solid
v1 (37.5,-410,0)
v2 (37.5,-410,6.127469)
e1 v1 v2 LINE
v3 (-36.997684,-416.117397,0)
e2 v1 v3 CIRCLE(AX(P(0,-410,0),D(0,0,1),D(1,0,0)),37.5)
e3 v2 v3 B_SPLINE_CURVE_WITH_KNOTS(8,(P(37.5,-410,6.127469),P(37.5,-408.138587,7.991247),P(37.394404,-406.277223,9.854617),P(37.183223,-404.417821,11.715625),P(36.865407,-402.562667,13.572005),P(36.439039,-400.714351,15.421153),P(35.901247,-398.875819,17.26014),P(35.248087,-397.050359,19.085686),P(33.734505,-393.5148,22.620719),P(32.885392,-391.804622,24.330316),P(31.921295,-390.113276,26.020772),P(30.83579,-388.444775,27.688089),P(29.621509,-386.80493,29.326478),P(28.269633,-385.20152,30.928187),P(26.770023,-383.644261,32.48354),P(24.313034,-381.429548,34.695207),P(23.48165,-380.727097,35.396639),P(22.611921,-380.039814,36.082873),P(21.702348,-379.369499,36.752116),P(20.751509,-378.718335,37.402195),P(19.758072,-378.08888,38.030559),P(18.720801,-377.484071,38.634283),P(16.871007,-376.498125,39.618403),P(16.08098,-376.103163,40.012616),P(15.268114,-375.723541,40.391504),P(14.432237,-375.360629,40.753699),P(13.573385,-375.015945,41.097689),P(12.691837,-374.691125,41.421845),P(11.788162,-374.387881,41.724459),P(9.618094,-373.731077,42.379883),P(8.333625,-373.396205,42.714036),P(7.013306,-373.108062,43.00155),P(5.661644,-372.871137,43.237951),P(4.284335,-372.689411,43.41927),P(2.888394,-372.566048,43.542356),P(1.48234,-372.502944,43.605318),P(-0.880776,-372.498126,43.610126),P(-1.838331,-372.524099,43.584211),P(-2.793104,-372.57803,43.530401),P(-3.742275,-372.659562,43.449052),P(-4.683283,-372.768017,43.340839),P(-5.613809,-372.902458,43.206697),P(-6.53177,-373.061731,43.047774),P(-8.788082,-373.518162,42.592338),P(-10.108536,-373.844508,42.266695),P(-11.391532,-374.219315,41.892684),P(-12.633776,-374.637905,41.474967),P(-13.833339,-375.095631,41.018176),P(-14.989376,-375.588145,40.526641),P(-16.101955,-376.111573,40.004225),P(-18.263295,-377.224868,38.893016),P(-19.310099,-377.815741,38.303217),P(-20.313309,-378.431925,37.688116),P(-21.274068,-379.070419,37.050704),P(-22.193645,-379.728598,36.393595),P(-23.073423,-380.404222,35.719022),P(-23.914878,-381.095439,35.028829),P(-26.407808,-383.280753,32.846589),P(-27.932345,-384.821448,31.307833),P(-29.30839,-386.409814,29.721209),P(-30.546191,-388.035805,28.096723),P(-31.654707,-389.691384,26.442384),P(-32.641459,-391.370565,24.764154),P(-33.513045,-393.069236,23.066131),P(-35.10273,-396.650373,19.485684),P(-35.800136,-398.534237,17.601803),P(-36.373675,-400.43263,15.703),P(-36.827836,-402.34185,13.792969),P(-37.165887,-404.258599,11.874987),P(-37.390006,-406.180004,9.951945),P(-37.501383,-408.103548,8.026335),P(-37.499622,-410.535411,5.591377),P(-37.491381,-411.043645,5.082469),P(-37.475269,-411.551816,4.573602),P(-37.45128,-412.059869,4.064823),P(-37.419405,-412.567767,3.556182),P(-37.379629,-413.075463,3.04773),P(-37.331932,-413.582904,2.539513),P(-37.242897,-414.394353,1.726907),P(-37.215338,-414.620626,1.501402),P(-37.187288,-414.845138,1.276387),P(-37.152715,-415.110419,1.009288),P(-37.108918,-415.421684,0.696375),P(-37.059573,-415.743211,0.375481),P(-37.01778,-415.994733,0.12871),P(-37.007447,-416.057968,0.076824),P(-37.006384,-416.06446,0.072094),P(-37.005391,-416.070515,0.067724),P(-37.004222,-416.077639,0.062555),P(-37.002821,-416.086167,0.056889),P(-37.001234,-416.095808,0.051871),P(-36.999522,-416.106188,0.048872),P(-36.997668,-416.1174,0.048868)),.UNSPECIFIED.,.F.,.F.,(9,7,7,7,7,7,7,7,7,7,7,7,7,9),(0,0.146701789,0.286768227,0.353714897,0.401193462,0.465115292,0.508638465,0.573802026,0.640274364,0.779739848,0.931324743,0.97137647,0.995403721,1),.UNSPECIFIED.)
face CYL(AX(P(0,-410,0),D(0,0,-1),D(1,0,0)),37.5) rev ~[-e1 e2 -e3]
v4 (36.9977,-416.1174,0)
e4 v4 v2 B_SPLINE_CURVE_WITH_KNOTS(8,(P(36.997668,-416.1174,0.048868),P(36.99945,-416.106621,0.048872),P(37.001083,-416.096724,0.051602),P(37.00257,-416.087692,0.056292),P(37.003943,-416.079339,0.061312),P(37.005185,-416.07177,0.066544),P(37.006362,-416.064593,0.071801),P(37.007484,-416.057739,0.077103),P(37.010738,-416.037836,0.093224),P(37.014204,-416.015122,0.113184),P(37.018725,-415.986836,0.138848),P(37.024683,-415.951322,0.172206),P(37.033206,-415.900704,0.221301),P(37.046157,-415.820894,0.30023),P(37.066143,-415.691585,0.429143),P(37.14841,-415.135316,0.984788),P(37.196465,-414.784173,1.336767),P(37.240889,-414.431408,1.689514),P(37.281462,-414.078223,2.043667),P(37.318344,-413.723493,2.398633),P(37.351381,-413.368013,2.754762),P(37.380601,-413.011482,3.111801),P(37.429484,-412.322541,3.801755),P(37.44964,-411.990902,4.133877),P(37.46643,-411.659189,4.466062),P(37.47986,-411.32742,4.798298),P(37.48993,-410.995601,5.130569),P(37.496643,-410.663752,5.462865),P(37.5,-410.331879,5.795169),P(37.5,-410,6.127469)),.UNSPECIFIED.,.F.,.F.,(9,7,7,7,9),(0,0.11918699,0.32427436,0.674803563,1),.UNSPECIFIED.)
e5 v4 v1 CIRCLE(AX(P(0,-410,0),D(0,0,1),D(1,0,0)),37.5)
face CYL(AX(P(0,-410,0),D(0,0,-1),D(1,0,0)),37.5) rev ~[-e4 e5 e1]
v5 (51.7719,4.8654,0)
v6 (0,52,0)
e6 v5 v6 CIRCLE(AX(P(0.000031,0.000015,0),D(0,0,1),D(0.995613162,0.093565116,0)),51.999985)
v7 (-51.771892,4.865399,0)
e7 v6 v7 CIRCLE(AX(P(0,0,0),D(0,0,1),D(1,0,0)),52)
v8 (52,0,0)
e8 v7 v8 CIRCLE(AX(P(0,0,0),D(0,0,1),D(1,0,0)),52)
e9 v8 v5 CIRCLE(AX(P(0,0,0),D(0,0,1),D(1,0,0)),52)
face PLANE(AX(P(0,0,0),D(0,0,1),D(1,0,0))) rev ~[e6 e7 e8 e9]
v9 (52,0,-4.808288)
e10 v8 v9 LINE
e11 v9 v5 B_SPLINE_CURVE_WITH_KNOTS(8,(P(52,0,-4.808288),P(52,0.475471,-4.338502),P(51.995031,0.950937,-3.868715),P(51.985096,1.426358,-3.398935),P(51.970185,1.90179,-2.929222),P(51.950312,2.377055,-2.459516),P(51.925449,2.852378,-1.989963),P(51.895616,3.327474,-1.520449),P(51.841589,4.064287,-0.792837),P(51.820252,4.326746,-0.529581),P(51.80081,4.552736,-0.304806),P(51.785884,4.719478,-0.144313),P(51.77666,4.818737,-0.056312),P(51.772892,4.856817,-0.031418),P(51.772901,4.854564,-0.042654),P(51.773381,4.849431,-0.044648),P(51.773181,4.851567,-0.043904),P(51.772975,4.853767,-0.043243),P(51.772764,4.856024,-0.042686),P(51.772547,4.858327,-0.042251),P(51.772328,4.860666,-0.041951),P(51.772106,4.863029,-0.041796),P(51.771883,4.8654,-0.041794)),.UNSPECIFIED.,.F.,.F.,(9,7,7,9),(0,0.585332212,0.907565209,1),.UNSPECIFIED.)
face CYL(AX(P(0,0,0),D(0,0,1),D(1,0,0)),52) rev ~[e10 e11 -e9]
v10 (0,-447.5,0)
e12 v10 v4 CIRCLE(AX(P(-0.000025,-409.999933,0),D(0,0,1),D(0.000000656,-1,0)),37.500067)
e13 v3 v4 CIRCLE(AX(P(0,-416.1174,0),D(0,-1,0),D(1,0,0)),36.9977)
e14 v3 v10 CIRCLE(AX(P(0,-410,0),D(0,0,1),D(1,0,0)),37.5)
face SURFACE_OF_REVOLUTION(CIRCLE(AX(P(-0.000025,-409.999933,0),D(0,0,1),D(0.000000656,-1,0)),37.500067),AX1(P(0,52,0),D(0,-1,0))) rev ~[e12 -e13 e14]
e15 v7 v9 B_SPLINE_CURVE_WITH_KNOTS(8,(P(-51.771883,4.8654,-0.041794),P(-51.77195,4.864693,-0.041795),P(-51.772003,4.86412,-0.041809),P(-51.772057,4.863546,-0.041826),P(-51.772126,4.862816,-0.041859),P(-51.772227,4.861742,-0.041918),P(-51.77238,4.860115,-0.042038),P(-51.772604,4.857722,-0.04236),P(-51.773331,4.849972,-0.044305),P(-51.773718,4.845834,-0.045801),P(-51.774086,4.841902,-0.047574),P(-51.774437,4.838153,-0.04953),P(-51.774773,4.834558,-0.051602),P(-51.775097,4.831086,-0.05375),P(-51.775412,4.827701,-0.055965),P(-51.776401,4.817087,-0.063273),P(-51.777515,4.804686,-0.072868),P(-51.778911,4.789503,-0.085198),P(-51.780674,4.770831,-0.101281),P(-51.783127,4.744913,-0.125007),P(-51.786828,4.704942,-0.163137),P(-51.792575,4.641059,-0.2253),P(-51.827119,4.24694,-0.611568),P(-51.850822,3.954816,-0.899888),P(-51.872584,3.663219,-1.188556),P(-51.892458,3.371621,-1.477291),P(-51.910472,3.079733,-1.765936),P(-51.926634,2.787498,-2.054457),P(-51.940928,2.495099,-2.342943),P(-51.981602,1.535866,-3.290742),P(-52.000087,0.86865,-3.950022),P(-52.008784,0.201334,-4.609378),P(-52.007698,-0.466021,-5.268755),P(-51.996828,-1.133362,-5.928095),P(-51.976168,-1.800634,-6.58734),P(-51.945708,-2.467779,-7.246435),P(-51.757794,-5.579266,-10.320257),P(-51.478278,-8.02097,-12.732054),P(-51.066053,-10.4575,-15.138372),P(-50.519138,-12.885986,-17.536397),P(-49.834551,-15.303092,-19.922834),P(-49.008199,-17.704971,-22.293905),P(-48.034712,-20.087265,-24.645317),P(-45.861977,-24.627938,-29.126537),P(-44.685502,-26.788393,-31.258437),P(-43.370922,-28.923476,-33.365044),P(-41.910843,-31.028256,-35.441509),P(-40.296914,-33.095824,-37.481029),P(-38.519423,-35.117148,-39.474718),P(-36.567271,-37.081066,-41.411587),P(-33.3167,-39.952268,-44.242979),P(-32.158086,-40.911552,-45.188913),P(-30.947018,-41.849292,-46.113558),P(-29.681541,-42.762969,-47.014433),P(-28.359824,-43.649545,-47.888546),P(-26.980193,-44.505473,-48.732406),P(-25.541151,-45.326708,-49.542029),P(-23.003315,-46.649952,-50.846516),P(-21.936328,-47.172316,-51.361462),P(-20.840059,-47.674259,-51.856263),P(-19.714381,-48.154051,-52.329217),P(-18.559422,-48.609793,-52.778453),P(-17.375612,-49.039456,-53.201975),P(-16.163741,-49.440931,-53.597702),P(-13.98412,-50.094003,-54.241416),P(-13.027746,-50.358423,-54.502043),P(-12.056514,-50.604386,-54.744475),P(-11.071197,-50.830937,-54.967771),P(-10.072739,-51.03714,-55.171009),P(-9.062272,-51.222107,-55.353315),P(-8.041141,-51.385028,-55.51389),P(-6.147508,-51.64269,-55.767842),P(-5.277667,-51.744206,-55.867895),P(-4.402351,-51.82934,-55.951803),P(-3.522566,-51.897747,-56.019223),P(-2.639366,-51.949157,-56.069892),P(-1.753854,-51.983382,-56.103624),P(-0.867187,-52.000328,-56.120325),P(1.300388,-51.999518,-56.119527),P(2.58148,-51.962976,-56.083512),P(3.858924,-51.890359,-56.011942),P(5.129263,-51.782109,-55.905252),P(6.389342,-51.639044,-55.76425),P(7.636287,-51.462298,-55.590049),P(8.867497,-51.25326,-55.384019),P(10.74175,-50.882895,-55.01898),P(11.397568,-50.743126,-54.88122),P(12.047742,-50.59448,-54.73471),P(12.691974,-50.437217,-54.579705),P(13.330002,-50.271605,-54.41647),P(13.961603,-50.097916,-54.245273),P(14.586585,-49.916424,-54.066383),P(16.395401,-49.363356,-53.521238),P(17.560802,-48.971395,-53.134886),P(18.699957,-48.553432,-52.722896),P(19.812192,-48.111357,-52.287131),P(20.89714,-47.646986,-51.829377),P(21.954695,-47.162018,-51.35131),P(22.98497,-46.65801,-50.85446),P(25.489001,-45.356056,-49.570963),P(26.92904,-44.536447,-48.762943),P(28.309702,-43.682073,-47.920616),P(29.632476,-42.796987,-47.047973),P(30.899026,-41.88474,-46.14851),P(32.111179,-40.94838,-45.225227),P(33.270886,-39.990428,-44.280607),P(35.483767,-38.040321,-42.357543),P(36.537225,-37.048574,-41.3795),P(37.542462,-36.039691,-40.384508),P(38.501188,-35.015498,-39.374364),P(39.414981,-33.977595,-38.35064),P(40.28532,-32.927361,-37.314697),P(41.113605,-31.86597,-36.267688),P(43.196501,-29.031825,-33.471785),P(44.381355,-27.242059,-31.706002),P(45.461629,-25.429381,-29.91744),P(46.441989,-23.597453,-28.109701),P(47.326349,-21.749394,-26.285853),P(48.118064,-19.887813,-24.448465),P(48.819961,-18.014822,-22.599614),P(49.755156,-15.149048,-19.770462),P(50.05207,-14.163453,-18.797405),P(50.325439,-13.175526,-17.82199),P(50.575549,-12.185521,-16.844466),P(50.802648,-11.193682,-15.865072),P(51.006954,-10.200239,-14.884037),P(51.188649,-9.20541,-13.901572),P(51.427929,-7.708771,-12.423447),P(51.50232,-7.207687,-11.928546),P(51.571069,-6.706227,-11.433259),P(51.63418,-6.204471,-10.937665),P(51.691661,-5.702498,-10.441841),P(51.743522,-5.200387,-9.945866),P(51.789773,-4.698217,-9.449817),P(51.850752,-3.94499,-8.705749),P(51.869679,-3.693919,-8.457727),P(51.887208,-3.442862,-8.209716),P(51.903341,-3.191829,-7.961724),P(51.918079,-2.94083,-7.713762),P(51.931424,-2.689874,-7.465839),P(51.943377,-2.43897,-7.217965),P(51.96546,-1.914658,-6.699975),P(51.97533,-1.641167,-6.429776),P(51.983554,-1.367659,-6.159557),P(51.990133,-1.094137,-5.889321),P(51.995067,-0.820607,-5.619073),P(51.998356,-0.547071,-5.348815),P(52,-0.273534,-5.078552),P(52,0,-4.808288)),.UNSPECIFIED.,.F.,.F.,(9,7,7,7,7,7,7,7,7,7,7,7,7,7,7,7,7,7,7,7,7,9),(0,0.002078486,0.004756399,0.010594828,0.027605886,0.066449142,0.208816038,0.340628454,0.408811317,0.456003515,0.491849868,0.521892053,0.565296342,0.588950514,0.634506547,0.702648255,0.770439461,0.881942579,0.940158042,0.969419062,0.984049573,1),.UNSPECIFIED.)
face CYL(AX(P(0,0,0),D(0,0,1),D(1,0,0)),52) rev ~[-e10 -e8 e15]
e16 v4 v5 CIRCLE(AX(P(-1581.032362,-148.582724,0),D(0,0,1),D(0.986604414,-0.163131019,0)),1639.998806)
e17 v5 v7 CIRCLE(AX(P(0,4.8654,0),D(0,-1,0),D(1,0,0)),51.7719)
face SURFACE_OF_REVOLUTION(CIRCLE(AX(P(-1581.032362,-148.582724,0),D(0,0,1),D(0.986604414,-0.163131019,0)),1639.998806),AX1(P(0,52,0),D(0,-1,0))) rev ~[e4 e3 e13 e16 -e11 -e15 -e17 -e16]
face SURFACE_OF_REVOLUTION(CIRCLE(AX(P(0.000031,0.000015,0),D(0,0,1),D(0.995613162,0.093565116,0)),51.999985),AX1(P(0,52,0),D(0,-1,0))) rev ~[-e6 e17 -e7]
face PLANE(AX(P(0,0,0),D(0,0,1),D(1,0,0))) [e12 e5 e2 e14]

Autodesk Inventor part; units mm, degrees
ref_plane "YZ Plane" through (0, 0, 0) normal (1, 0, 0) x (0, 1, 0)
ref_plane "XZ Plane" through (0, 0, 0) normal (0, 1, 0) x (-1, 0, 0)
ref_plane "XY Plane" through (0, 0, 0) normal (0, 0, 1) x (1, 0, 0)
sketch "Эскиз1" plane through (0, 0, 0) normal (0, 0, 1) x (1, 0, 0)
  arc A0 (0, -52) -> (51.7719, 4.8654) centre (0, 0) ccw construction
  arc A1 (0, -447.5) -> (36.9977, -416.1174) centre (0, -410) ccw
  arc A2 (36.9977, -416.1174) -> (51.7719, 4.8654) centre (-1581.0336, -148.5826) ccw
  line L0 (0, 126.4279) -> (0, -660.0166)
  arc A3 (0, 52) -> (0, -52) centre (0, 0) ccw construction
  arc A4 (0, -372.5) -> (0, -447.5) centre (0, -410) ccw construction
  arc A5 (51.7719, 4.8654) -> (0, 52) centre (0, 0) ccw
  arc A6 (36.9977, -416.1174) -> (0, -372.5) centre (0, -410) ccw construction
  point P0 (0, -266.7943)
  dimension "d0" = 104
  dimension "d1" = 75
  dimension "d2" = 410
  dimension "d3" = 1640
revolve "Вращение1" add sketch "Эскиз1" angle 360 about axis through (0, 126.4279, 0) along (0, -1, 0)
sketch "Эскиз2" plane through (0, 0, 0) normal (0, 0, 1) x (1, 0, 0)
  circle A0 centre (0, 0) radius 52
  dimension "d5" = 104
extrude "Выдавливание1" cut sketch "Эскиз2" against normal through all
sketch "Эскиз3" plane through (0, 0, 0) normal (0, 0, 1) x (1, 0, 0)
  circle A0 centre (0, -410) radius 37.5
  point P0 (0, 0)
  dimension "d8" = 410
  dimension "d9" = 75
extrude "Выдавливание2" cut sketch "Эскиз3" along normal through all
equation "\"d0\" = knee_diam"
equation "\"d1\" = feet_joint_diam"
equation "\"d2\" = surae"
equation "\"d3\" = 4 * surae"
equation "\"d5\" = knee_diam"
equation "\"d8\" = surae"
equation "\"d9\" = feet_joint_diam"
equation "\"knee_diam\" = 104"
equation "\"feet_joint_diam\" = 75"
equation "\"surae\" = 410"
properties part number "ч ASY human dummy 01"
